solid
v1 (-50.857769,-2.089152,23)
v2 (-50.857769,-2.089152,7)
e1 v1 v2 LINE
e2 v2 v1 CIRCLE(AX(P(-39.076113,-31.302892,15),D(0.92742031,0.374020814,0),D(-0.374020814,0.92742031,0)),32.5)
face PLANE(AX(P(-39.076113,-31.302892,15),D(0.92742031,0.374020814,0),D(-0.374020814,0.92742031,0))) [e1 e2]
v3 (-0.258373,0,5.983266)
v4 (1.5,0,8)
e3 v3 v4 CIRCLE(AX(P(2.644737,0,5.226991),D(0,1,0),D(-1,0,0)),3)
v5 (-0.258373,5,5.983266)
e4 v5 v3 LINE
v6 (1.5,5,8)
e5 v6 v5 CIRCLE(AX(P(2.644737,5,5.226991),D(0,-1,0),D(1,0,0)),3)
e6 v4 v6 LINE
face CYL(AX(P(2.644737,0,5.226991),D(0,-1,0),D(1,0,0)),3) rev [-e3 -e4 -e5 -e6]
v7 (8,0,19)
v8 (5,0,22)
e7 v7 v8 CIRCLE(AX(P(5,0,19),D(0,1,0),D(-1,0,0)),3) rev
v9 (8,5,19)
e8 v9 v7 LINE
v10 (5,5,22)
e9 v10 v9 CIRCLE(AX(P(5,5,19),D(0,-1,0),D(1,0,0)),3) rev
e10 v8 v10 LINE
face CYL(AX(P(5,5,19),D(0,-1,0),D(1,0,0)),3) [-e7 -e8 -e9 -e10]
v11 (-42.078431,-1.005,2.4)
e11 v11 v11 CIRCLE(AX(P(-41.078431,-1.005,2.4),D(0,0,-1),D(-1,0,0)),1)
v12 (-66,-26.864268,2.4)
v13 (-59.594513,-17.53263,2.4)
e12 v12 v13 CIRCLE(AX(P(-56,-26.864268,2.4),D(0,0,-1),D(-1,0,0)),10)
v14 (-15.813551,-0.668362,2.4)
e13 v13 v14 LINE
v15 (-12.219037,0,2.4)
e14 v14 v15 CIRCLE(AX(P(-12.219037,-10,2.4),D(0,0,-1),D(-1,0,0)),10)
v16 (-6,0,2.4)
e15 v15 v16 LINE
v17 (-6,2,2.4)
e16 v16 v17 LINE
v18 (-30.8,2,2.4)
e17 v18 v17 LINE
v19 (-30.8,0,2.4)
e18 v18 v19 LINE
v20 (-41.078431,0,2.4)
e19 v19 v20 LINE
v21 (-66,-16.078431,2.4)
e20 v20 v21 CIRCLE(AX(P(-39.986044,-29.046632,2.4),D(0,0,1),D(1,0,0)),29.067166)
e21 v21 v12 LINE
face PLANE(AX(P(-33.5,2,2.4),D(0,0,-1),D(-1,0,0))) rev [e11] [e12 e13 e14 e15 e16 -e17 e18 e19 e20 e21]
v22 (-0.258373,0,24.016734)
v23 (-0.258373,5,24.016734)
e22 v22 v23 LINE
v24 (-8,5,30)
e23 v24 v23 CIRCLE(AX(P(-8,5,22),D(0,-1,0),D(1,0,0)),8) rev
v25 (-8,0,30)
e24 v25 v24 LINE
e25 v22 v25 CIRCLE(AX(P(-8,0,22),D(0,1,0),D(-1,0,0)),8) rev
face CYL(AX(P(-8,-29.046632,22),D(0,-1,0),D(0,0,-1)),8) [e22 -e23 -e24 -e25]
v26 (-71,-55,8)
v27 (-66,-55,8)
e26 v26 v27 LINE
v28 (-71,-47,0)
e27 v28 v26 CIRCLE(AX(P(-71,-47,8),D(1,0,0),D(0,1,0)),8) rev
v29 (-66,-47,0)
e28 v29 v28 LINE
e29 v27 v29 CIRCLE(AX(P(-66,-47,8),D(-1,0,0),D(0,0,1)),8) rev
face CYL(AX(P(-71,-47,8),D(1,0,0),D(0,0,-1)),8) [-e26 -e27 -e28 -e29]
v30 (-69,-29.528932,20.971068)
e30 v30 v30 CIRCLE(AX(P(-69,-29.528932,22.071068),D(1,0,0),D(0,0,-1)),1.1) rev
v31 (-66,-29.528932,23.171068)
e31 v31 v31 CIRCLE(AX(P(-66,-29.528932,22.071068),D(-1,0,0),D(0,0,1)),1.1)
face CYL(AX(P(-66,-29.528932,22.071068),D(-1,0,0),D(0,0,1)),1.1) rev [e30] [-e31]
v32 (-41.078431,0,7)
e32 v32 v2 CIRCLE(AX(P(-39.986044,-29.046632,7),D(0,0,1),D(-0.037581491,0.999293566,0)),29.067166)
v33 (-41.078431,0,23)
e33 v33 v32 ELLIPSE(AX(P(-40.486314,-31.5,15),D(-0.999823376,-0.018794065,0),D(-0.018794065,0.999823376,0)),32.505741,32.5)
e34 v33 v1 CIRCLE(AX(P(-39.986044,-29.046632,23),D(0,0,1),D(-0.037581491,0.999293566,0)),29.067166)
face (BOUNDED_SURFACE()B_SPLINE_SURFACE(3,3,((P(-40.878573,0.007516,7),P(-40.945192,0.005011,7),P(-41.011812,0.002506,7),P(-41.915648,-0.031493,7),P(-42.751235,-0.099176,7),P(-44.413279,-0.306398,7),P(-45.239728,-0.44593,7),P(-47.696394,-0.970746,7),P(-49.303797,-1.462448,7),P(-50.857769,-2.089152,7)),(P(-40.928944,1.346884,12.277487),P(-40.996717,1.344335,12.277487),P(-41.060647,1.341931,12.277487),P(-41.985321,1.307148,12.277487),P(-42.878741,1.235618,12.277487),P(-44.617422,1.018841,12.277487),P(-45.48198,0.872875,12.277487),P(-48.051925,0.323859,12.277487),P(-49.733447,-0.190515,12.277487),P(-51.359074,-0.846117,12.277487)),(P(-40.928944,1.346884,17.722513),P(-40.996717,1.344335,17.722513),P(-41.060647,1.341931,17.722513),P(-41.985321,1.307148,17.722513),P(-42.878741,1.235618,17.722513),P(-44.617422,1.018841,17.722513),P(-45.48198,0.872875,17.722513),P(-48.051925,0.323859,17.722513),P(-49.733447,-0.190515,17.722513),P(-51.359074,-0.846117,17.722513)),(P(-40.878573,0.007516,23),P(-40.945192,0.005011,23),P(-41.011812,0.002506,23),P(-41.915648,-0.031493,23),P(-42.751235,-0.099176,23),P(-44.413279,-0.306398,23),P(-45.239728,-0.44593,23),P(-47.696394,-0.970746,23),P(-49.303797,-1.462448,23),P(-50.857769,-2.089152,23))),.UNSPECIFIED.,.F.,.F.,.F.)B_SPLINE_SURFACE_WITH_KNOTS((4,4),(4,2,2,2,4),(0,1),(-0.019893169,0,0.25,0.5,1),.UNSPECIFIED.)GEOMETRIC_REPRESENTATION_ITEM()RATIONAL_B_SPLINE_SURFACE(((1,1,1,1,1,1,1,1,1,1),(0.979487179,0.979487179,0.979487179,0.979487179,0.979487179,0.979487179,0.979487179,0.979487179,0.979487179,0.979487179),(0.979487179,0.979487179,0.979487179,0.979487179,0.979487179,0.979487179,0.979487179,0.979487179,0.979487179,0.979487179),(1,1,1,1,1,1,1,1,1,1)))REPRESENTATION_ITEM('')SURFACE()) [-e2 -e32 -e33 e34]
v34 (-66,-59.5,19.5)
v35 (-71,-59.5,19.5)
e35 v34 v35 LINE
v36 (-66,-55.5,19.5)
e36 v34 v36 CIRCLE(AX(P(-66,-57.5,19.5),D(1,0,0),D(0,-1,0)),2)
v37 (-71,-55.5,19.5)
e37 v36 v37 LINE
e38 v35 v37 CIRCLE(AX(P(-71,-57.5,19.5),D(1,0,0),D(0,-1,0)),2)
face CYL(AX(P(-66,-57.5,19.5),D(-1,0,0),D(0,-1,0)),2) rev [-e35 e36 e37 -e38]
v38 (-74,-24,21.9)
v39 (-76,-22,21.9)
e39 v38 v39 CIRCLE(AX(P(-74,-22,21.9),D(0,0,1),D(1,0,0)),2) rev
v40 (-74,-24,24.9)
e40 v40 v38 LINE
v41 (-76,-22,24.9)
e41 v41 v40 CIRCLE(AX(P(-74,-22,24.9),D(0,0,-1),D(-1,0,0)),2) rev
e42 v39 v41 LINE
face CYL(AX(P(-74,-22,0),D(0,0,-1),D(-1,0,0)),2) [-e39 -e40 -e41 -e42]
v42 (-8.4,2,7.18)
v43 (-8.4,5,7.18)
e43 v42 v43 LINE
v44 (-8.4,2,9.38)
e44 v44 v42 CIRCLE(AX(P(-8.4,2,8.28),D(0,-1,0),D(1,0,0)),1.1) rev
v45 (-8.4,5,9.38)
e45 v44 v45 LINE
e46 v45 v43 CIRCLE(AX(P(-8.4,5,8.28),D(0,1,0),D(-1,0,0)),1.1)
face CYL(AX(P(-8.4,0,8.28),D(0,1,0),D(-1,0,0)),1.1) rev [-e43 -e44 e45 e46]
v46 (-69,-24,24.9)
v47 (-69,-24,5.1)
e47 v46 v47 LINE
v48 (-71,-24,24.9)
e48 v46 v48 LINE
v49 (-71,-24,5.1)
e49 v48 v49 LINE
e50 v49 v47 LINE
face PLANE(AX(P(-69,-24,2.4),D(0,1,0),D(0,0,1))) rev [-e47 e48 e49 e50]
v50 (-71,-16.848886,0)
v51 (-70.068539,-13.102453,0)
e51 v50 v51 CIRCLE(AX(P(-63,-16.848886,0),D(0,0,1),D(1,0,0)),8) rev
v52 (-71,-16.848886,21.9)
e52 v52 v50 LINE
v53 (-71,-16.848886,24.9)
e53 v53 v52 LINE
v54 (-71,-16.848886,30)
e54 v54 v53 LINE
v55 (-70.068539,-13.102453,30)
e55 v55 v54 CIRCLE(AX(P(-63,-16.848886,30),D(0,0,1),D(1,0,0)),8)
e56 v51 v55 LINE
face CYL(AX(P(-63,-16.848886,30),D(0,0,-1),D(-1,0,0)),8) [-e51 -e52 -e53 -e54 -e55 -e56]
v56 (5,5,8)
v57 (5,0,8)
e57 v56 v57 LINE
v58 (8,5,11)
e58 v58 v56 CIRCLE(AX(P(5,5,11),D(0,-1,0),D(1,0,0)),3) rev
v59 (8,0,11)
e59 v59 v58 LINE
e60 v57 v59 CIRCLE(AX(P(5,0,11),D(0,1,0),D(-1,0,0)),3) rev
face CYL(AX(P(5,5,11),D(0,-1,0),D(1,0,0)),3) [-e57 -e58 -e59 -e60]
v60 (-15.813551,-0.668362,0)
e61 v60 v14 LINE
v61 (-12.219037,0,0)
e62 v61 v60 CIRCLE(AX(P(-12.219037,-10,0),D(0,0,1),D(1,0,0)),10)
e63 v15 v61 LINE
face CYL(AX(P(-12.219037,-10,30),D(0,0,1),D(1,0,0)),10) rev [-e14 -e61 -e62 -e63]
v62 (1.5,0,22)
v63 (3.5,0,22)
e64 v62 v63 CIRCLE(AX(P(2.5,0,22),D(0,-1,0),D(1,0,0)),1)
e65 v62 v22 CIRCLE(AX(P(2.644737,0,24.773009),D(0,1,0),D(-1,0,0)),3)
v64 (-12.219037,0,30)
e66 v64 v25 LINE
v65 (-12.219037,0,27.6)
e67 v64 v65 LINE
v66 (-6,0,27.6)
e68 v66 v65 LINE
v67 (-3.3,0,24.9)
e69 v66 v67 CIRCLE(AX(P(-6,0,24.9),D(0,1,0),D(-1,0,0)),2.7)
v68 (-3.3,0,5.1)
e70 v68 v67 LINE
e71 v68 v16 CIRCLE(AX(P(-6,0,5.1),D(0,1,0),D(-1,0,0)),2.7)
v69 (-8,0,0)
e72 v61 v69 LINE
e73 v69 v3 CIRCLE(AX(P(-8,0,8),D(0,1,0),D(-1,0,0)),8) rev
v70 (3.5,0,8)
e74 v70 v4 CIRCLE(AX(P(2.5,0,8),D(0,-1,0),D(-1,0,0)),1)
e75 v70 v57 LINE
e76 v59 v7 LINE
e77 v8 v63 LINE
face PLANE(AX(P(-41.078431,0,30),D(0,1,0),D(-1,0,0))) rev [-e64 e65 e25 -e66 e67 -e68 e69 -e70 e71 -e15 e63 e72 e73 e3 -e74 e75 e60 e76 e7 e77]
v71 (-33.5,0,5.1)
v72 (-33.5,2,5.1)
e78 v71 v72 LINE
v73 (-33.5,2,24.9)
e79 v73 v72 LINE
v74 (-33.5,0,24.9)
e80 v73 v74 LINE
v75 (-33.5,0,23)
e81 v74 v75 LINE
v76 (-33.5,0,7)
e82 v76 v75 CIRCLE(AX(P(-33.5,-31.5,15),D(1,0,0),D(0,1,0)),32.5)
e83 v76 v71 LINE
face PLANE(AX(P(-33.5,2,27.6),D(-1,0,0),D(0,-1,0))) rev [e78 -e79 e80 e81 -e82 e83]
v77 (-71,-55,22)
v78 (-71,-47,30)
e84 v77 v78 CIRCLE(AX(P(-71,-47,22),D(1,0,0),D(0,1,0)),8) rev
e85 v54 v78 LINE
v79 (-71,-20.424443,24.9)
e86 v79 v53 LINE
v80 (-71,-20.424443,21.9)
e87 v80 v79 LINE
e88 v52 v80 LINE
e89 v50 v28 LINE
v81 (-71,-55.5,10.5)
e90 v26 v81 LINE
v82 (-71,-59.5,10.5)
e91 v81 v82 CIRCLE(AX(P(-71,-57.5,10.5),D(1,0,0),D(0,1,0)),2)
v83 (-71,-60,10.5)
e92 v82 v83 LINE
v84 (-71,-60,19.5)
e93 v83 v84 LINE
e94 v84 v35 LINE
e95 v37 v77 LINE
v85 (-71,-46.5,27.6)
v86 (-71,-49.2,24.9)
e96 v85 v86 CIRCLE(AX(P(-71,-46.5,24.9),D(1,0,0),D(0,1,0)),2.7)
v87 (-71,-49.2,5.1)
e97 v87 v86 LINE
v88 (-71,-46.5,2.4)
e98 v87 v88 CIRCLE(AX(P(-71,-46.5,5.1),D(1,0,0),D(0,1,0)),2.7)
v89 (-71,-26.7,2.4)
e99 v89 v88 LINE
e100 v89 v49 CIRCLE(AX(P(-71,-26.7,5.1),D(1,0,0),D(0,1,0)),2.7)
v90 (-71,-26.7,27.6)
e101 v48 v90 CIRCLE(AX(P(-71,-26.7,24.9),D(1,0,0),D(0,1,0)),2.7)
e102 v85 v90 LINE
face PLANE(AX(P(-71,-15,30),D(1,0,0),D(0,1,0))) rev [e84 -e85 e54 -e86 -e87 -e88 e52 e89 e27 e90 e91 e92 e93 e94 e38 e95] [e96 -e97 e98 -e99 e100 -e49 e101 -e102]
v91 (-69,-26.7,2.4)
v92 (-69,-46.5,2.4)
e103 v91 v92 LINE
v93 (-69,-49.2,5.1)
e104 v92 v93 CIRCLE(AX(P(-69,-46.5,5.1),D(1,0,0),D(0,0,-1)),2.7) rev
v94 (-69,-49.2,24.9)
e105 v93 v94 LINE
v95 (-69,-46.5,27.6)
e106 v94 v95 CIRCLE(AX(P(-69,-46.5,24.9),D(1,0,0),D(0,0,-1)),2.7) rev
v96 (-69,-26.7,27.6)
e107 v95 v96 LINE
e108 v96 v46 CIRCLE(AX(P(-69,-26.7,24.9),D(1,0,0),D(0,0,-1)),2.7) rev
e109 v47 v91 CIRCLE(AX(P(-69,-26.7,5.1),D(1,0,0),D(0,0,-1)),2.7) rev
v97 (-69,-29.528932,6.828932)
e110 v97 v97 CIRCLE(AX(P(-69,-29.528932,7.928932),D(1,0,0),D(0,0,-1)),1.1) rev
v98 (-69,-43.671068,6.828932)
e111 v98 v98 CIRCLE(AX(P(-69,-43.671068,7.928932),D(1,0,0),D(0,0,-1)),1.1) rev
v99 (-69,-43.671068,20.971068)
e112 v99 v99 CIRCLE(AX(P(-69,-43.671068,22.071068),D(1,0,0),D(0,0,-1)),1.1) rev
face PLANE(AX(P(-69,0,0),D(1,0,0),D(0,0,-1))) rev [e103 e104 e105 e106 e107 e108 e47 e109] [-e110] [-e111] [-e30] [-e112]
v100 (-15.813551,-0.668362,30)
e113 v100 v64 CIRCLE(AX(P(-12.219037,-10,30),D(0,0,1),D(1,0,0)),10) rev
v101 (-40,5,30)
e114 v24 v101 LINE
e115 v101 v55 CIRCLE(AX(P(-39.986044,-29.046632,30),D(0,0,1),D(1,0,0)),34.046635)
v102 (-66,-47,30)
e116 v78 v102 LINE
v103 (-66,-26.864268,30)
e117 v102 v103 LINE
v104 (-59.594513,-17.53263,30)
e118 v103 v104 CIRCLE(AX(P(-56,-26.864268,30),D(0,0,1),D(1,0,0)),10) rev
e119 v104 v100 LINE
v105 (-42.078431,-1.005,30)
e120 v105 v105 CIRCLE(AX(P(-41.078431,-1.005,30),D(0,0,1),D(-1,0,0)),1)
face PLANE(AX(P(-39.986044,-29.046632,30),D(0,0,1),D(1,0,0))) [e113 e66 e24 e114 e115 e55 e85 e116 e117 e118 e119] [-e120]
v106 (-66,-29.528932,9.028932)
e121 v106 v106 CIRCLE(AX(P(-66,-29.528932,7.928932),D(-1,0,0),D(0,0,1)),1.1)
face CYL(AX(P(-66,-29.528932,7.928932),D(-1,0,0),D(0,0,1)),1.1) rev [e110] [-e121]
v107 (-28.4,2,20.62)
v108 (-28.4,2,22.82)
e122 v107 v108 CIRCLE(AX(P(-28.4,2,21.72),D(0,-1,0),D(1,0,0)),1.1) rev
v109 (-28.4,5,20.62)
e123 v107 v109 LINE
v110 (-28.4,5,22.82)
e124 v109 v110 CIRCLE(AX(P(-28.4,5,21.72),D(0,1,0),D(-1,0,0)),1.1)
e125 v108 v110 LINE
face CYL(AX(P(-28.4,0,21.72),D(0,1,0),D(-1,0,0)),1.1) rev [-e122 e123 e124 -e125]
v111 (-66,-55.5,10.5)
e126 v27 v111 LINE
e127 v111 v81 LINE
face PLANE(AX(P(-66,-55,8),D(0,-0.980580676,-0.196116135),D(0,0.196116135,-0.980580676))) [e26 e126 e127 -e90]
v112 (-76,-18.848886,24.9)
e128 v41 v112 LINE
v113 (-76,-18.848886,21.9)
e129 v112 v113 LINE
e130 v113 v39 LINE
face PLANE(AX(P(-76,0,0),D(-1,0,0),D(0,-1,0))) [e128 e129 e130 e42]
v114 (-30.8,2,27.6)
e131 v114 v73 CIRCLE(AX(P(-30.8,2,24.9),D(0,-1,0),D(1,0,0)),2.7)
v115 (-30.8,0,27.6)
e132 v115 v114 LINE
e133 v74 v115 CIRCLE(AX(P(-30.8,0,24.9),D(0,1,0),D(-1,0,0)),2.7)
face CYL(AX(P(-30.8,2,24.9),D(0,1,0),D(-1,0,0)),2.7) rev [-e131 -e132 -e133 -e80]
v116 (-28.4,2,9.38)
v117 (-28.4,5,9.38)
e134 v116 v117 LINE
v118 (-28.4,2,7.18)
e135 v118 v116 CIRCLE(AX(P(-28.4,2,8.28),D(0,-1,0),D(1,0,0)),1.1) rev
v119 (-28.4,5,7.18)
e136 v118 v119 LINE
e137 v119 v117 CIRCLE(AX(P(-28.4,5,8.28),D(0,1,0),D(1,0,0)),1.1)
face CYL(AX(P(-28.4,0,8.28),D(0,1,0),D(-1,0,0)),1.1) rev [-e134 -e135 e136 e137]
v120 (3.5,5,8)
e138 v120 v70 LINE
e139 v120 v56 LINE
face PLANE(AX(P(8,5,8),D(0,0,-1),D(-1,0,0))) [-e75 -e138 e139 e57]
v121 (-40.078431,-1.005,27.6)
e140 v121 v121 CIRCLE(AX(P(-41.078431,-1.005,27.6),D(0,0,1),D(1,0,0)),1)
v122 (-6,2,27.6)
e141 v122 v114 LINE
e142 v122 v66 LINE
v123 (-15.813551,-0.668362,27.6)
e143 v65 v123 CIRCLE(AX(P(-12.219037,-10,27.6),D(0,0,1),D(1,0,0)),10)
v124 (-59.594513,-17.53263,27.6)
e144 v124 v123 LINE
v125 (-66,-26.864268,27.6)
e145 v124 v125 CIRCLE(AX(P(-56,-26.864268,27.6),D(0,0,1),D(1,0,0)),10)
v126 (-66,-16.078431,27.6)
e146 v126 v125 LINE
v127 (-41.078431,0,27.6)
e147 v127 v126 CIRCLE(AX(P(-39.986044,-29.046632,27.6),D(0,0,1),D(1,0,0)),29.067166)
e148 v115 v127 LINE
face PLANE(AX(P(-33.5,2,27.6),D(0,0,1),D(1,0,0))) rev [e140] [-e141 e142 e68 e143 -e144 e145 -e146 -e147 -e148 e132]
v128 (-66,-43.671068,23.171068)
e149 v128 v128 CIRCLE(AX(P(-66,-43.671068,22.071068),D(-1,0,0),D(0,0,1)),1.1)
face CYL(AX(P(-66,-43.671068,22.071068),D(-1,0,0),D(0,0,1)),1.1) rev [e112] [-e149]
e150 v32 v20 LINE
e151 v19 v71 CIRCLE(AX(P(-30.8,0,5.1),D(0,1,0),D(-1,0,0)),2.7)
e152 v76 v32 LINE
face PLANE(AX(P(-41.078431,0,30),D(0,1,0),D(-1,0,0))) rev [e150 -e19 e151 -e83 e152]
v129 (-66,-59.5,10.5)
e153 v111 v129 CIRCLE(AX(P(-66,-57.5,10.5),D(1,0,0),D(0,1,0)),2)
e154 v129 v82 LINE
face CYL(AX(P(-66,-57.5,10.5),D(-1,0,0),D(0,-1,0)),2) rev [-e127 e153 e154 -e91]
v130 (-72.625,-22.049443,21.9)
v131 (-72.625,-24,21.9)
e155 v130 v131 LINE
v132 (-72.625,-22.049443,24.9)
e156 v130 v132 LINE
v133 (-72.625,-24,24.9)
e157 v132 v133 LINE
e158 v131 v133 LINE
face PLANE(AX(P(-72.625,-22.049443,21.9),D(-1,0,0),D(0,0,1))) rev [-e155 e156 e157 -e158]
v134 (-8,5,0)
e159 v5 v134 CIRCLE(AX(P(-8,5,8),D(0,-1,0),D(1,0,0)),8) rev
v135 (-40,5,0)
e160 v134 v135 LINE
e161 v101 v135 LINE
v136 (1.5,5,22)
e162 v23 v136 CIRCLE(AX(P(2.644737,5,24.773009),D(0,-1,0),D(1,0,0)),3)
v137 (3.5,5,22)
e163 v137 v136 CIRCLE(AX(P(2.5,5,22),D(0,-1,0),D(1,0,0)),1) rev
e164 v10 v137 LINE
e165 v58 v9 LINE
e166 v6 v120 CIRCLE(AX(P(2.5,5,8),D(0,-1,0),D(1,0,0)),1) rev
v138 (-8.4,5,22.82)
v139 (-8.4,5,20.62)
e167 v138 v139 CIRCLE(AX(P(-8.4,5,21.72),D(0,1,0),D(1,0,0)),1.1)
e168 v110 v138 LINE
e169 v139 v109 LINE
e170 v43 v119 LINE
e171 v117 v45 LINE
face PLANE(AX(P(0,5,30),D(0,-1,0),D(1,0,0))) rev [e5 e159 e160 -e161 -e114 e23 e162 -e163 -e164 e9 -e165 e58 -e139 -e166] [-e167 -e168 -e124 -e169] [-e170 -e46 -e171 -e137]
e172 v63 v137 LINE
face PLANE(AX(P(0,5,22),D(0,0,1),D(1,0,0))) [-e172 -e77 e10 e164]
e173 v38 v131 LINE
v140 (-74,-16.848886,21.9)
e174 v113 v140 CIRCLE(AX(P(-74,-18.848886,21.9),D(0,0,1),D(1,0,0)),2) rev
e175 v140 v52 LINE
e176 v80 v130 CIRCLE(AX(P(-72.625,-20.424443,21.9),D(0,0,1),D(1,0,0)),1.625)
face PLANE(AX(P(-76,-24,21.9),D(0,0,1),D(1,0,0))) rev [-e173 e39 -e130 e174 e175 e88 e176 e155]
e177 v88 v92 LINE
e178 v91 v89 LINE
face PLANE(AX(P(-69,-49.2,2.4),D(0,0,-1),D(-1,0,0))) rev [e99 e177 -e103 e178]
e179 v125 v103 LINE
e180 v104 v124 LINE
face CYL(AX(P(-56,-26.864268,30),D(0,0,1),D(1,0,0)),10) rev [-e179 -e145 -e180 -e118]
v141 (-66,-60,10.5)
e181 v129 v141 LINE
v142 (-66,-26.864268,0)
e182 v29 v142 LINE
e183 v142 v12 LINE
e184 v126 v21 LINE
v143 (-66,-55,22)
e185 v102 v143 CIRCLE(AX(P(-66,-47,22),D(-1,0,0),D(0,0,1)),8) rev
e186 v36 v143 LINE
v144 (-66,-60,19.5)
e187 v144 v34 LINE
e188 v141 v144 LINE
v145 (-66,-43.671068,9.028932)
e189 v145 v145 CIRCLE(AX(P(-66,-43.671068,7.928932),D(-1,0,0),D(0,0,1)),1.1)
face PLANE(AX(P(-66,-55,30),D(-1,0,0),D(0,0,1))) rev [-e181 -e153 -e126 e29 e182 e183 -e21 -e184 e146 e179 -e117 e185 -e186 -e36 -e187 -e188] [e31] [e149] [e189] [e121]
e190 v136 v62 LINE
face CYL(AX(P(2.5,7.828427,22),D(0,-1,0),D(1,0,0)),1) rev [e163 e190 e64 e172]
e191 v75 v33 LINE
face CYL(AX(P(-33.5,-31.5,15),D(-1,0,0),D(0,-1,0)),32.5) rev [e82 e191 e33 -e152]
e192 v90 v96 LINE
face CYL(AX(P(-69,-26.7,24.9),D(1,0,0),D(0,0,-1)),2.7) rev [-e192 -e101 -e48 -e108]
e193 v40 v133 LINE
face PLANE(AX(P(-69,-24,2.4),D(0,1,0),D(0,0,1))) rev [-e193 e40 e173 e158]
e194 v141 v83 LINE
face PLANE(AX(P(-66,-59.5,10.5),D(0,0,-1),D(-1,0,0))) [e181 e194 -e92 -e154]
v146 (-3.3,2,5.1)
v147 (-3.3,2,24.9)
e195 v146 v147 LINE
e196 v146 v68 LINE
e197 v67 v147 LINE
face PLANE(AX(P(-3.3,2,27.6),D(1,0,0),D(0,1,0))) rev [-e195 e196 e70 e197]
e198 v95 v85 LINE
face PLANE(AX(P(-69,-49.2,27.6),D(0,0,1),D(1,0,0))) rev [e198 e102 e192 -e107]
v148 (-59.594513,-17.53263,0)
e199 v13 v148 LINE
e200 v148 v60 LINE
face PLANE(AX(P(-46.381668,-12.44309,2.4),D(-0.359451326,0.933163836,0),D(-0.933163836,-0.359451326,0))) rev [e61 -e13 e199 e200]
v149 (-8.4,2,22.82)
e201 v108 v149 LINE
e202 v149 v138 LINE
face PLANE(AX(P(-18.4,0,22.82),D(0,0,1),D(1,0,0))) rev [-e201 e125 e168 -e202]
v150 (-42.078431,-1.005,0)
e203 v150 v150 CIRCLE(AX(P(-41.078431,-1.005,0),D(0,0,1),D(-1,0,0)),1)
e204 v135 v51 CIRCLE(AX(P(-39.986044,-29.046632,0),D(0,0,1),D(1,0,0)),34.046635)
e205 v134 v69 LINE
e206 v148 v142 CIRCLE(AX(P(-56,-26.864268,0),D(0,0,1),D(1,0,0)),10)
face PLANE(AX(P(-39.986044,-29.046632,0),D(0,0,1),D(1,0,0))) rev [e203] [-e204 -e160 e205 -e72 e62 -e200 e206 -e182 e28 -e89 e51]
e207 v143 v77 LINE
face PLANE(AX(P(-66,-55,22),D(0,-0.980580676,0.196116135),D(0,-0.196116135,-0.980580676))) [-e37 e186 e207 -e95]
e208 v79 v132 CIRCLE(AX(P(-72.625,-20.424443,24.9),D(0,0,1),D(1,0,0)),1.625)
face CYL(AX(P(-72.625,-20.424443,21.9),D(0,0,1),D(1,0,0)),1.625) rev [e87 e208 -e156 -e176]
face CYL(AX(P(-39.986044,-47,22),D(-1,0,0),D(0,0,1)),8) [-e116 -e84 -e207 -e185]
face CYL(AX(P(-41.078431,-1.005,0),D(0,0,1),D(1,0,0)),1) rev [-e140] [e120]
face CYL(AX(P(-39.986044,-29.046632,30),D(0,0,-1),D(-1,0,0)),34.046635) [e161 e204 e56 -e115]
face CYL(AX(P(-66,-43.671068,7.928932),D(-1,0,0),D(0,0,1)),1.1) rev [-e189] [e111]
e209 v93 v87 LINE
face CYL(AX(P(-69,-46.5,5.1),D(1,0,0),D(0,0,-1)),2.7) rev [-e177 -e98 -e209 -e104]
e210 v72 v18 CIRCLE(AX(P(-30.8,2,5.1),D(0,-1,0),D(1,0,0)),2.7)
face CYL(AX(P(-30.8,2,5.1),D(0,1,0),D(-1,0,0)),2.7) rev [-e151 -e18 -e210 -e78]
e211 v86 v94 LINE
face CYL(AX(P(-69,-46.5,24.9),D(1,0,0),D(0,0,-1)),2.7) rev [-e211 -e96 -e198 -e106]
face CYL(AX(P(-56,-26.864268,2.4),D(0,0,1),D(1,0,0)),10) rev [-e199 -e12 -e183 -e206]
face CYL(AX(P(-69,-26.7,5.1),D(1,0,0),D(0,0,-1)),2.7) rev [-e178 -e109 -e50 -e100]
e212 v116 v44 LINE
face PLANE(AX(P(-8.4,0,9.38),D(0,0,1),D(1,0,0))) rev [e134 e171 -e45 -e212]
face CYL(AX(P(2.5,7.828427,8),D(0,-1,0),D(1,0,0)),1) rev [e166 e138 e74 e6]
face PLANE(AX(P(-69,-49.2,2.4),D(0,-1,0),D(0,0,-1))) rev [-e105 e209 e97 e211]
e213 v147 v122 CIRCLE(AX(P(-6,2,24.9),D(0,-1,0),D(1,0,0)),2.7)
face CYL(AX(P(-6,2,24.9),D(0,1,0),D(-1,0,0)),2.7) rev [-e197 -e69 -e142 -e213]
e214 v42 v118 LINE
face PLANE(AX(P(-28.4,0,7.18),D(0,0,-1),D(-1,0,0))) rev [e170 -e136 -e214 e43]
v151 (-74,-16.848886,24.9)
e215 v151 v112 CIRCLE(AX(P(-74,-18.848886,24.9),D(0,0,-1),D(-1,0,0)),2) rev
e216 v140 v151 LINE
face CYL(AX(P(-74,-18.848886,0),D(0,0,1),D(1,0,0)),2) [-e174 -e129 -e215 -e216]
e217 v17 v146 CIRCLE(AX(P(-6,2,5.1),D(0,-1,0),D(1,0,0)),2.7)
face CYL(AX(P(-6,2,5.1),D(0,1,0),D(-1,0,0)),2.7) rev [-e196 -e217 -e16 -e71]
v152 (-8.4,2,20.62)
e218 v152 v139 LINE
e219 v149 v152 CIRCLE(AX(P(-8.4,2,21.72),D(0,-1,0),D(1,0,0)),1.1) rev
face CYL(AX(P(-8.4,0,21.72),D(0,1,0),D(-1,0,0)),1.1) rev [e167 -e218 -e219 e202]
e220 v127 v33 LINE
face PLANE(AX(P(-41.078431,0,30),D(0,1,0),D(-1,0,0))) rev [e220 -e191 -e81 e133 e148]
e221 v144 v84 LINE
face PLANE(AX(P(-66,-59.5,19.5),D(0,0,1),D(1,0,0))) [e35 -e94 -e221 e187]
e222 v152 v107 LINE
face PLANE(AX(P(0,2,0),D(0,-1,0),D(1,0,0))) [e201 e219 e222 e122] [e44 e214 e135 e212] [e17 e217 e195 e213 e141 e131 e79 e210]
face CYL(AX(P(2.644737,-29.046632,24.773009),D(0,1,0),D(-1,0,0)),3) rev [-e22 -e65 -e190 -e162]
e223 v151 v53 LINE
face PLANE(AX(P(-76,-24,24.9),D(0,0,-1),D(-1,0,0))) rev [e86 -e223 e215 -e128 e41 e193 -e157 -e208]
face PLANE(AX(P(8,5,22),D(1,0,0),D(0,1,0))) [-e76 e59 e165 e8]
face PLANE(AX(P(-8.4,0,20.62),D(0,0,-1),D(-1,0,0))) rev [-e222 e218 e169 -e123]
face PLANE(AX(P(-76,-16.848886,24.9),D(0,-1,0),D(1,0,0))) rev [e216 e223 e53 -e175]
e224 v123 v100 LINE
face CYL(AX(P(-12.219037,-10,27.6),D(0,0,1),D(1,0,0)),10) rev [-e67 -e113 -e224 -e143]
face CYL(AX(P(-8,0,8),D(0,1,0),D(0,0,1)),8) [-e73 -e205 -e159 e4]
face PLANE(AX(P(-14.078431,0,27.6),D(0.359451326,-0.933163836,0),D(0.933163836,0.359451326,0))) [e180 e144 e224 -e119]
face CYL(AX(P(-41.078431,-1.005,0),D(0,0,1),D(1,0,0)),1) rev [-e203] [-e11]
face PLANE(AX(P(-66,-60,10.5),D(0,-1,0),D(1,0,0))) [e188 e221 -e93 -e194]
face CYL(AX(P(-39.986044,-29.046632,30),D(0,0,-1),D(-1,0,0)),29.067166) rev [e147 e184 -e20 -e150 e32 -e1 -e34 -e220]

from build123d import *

# Parameters (mm, degrees)
SALIENTE_EXTRUIR1_DEPTH = 30
CORTAR_EXTRUIR1_DEPTH   = 5
CROQUIS3_W              = 30.2
CROQUIS3_H              = 25.2
CORTAR_EXTRUIR2_DEPTH   = 2
CROQUIS4_R              = 1.1
CORTAR_EXTRUIR3_DEPTH   = 5
CROQUIS5_W              = 25.2
CROQUIS5_H              = 25.2
CORTAR_EXTRUIR4_DEPTH   = 2
REDONDEO2_R             = 8
REDONDEO3_R             = 2.7
CROQUIS6_W              = 8
CROQUIS6_H              = 14
SALIENTE_EXTRUIR2_DEPTH = 5
REDONDEO4_R             = 3
SALIENTE_EXTRUIR4_START = -2.4
SALIENTE_EXTRUIR4_DEPTH = 2.4
SALIENTE_EXTRUIR5_START = -30
SALIENTE_EXTRUIR5_DEPTH = 2.4
REDONDEO5_R             = 10
SALIENTE_EXTRUIR6_START = -5
SALIENTE_EXTRUIR6_DEPTH = 5
CORTAR_EXTRUIR6_START   = -2.4
CROQUIS14_R             = 1
CORTAR_EXTRUIR6_DEPTH   = 30
CROQUIS18_W             = 3
CROQUIS18_H             = 7.151114147
SALIENTE_EXTRUIR7_DEPTH = 5
CORTAR_EXTRUIR7_START   = -3
CORTAR_EXTRUIR7_DEPTH   = 3
CROQUIS22_R             = 1
CORTAR_EXTRUIR8_DEPTH   = 5
REDONDEO8_R             = 2
REDONDEO6_R             = 3


with BuildPart() as part:
    # Croquis1 → Saliente-Extruir1 (new body)
    with BuildSketch(Plane.XY):
        with BuildLine():
            Line((0, 0), (0, 5))
            Line((0, 5), (-40, 5))
            ThreePointArc((-40, 5), (-58.443639467, -0.437358826), (-71, -15))
            Line((-71, -15), (-71, -55))
            Line((-71, -55), (-66, -55))
            Line((-66, -55), (-66, -16.078431373))
            ThreePointArc((-66, -16.078431373), (-55.744135615, -4.621589797), (-41.078431373, 0))
            Line((-41.078431373, 0), (0, 0))
        make_face()
    extrude(amount=SALIENTE_EXTRUIR1_DEPTH)

    # Croquis2 → Cortar-Extruir1 (cut)
    with BuildSketch(Plane(origin=(0, 5, 0), x_dir=(1, 0, 0), z_dir=(0, 1, 0))):
        with BuildLine():
            Line((-18.4, -7.18), (-8.4, -7.18))
            ThreePointArc((-8.4, -7.18), (-7.3, -8.28), (-8.4, -9.38))
            Line((-8.4, -9.38), (-28.4, -9.38))
            ThreePointArc((-28.4, -9.38), (-29.5, -8.28), (-28.4, -7.18))
            Line((-28.4, -7.18), (-18.4, -7.18))
        make_face()
        with BuildLine():
            Line((-8.4, -20.62), (-28.4, -20.62))
            ThreePointArc((-28.4, -20.62), (-29.5, -21.72), (-28.4, -22.82))
            Line((-28.4, -22.82), (-18.4, -22.82))
            Line((-18.4, -22.82), (-8.4, -22.82))
            ThreePointArc((-8.4, -22.82), (-7.3, -21.72), (-8.4, -20.62))
        make_face()
    extrude(amount=-CORTAR_EXTRUIR1_DEPTH, mode=Mode.SUBTRACT)

    # Croquis3 → Cortar-Extruir2 (cut)
    with BuildSketch(Plane.XZ):
        with Locations((-18.4, 15)):
            Rectangle(CROQUIS3_W, CROQUIS3_H)
    extrude(amount=-CORTAR_EXTRUIR2_DEPTH, mode=Mode.SUBTRACT)

    # Croquis4 → Cortar-Extruir3 (cut)
    with BuildSketch(Plane.ZY.offset(71)):
        with Locations((22.071067812, -29.528932188)):
            Circle(CROQUIS4_R)
        with Locations((22.071067812, -43.671067812)):
            Circle(CROQUIS4_R)
        with Locations((7.928932188, -43.671067812)):
            Circle(CROQUIS4_R)
        with Locations((7.928932188, -29.528932188)):
            Circle(CROQUIS4_R)
    extrude(amount=-CORTAR_EXTRUIR3_DEPTH, mode=Mode.SUBTRACT)

    # Croquis5 → Cortar-Extruir4 (cut)
    with BuildSketch(Plane.ZY.offset(71)):
        with Locations((15, -36.6)):
            Rectangle(CROQUIS5_W, CROQUIS5_H)
    extrude(amount=-CORTAR_EXTRUIR4_DEPTH, mode=Mode.SUBTRACT)

    # Redondeo2
    redondeo2_edges = [part.edges().sort_by_distance(p)[0] for p in [
        (0, 2.5, 0),
        (-71, -15, 15),
        (-68.5, -55, 30),
        (0, 2.5, 30),
        (-68.5, -55, 0),
    ]]
    fillet(redondeo2_edges, radius=REDONDEO2_R)

    # Redondeo3
    redondeo3_edges = [part.edges().sort_by_distance(p)[0] for p in [
        (-70, -24, 27.6),
        (-70, -49.2, 27.6),
        (-70, -49.2, 2.4),
        (-70, -24, 2.4),
        (-3.3, 1, 27.6),
        (-3.3, 1, 2.4),
        (-33.5, 1, 2.4),
        (-33.5, 1, 27.6),
    ]]
    fillet(redondeo3_edges, radius=REDONDEO3_R)

    # Croquis6 → Saliente-Extruir2 (add)
    with BuildSketch(Plane.XZ):
        with Locations((4, 15)):
            Rectangle(CROQUIS6_W, CROQUIS6_H)
    extrude(amount=-SALIENTE_EXTRUIR2_DEPTH)

    # Redondeo4
    redondeo4_edges = [part.edges().sort_by_distance(p)[0] for p in [
        (8, 2.5, 8),
        (8, 2.5, 22),
    ]]
    fillet(redondeo4_edges, radius=REDONDEO4_R)

    # Croquis11 → Saliente-Extruir4 (add)
    with BuildSketch(Plane.XY.offset(30).offset(SALIENTE_EXTRUIR4_START)):
        with BuildLine():
            Line((-41.078431373, 0), (-14.078431373, 0))
            Line((-14.078431373, 0), (-66, -20))
            Line((-66, -20), (-66, -16.078431373))
            ThreePointArc((-66, -16.078431373), (-55.744135615, -4.621589797), (-41.078431373, 0))
        make_face()
    extrude(amount=SALIENTE_EXTRUIR4_DEPTH)

    # Croquis11<2> → Saliente-Extruir5 (add)
    with BuildSketch(Plane.XY.offset(30).offset(SALIENTE_EXTRUIR5_START)):
        with BuildLine():
            Line((-41.078431373, 0), (-14.078431373, 0))
            Line((-14.078431373, 0), (-66, -20))
            Line((-66, -20), (-66, -16.078431373))
            ThreePointArc((-66, -16.078431373), (-55.744135615, -4.621589797), (-41.078431373, 0))
        make_face()
    extrude(amount=SALIENTE_EXTRUIR5_DEPTH)

    # Redondeo5
    redondeo5_edges = [part.edges().sort_by_distance(p)[0] for p in [
        (-14.078431373, 0, 28.8),
        (-66, -20, 28.8),
        (-66, -20, 1.2),
        (-14.078431373, 0, 1.2),
    ]]
    fillet(redondeo5_edges, radius=REDONDEO5_R)

    # Croquis12 → Saliente-Extruir6 (add)
    with BuildSketch(Plane.ZY.offset(71).offset(SALIENTE_EXTRUIR6_START)):
        with BuildLine():
            Line((10.5, -55), (19.5, -55))
            Line((19.5, -55), (22, -55))
            Line((22, -55), (19.5, -55.5))
            ThreePointArc((19.5, -55.5), (17.5, -57.5), (19.5, -59.5))
            Line((19.5, -59.5), (19.5, -60))
            Line((19.5, -60), (10.5, -60))
            Line((10.5, -60), (10.5, -59.5))
            ThreePointArc((10.5, -59.5), (12.5, -57.5), (10.5, -55.5))
            Line((10.5, -55.5), (8, -55))
            Line((8, -55), (10.5, -55))
        make_face()
    extrude(amount=SALIENTE_EXTRUIR6_DEPTH)

    # Croquis14 → Cortar-Extruir6 (cut)
    with BuildSketch(Plane.XY.offset(2.4).offset(CORTAR_EXTRUIR6_START)):
        with Locations((-41.078431373, -1.005)):
            Circle(CROQUIS14_R)
    extrude(amount=CORTAR_EXTRUIR6_DEPTH, mode=Mode.SUBTRACT)

    # Croquis18 → Saliente-Extruir7 (add)
    with BuildSketch(Plane.ZY.offset(71)):
        with Locations((23.4, -20.424442926)):
            Rectangle(CROQUIS18_W, CROQUIS18_H)
    extrude(amount=SALIENTE_EXTRUIR7_DEPTH)

    # Croquis19 → Cortar-Extruir7 (cut)
    with BuildSketch(Plane.XY.offset(24.9).offset(CORTAR_EXTRUIR7_START)):
        with BuildLine():
            Line((-72.625, -22.049442927), (-72.625, -24))
            Line((-72.625, -24), (-71, -24))
            Line((-71, -24), (-71, -20.424442927))
            ThreePointArc((-71, -20.424442927), (-73.774048519, -19.275394407), (-72.625, -22.049442927))
        make_face()
    extrude(amount=CORTAR_EXTRUIR7_DEPTH, mode=Mode.SUBTRACT)

    # Croquis22 → Cortar-Extruir8 (cut)
    with BuildSketch(Plane.XZ):
        with Locations((2.5, 22)):
            Circle(CROQUIS22_R)
        with Locations((2.5, 8)):
            Circle(CROQUIS22_R)
    extrude(amount=-CORTAR_EXTRUIR8_DEPTH, mode=Mode.SUBTRACT)

    # Redondeo8
    redondeo8_edges = [part.edges().sort_by_distance(p)[0] for p in [
        (-76, -16.848885853, 23.4),
        (-76, -24, 23.4),
    ]]
    fillet(redondeo8_edges, radius=REDONDEO8_R)

    # Cortar-Barrer1: sweep along a path in Croquis23
    with BuildLine(Plane.XY.offset(2.4)) as cortar_barrer1_path:
        Line((-33.5, 0), (-41.078431373, 0))
        ThreePointArc((-41.078431373, 0), (-46.058616362, -0.620868951), (-50.857769, -2.089151876))
    # Croquis24 → Cortar-Barrer1 (sweep, cut)
    with BuildSketch(Plane(origin=(-33.5, 0, 0), x_dir=(0, 0, -1), z_dir=(1, 0, 0))):
        with BuildLine():
            Line((-7, 0), (-23, 0))
            ThreePointArc((-23, 0), (-15, 1), (-7, 0))
        make_face()
    sweep(path=cortar_barrer1_path.line, transition=Transition.RIGHT, mode=Mode.SUBTRACT)

    # Redondeo6
    # the kernel refuses this fillet: 3 mm, written as the material it adds along each edge
    with BuildSketch(Plane(origin=(0, 0, 8), x_dir=(-0.1270760613131033, 0, -0.9918929753966144), z_dir=(0, 1, 0))) as redondeo6_piece_1:
        with BuildLine():
            CenterArc((2.414445165, -2.975678926), REDONDEO6_R, 97.300661555, 52.967156255)
            Line((-0.190614092, -1.487839463), (-0.242715277, -1.458082674))
            ThreePointArc((-0.242715277, -1.458082674), (-0.154820625, -0.736295168), (-0.059513579, 0.007624564))
            Line((-0.059513579, 0.007624564), (0.007624564, 0.059513579))
            ThreePointArc((0.007624564, 0.059513579), (1.016608491, -0.004856197), (2.025592417, 0.059513579))
            Line((2.025592417, 0.059513579), (2.033216981, 0))
        make_face()
    extrude(amount=5)
    with BuildSketch(Plane(origin=(0, 0, 22), x_dir=(-0.12707606131310373, 0, 0.9918929753966141), z_dir=(0, 1, 0))) as redondeo6_piece_2:
        with BuildLine():
            CenterArc((2.414445165, 2.975678926), REDONDEO6_R, 209.73218219, 52.967156255)
            Line((-0.190614092, 1.487839463), (-0.242715277, 1.458082674))
            ThreePointArc((-0.242715277, 1.458082674), (-0.154820625, 0.736295168), (-0.059513579, -0.007624564))
            Line((-0.059513579, -0.007624564), (0.007624564, -0.059513579))
            ThreePointArc((0.007624564, -0.059513579), (1.016608491, 0.004856197), (2.025592417, -0.059513579))
            Line((2.025592417, -0.059513579), (2.033216981, 0))
        make_face()
    extrude(amount=5)


solid = part.part
